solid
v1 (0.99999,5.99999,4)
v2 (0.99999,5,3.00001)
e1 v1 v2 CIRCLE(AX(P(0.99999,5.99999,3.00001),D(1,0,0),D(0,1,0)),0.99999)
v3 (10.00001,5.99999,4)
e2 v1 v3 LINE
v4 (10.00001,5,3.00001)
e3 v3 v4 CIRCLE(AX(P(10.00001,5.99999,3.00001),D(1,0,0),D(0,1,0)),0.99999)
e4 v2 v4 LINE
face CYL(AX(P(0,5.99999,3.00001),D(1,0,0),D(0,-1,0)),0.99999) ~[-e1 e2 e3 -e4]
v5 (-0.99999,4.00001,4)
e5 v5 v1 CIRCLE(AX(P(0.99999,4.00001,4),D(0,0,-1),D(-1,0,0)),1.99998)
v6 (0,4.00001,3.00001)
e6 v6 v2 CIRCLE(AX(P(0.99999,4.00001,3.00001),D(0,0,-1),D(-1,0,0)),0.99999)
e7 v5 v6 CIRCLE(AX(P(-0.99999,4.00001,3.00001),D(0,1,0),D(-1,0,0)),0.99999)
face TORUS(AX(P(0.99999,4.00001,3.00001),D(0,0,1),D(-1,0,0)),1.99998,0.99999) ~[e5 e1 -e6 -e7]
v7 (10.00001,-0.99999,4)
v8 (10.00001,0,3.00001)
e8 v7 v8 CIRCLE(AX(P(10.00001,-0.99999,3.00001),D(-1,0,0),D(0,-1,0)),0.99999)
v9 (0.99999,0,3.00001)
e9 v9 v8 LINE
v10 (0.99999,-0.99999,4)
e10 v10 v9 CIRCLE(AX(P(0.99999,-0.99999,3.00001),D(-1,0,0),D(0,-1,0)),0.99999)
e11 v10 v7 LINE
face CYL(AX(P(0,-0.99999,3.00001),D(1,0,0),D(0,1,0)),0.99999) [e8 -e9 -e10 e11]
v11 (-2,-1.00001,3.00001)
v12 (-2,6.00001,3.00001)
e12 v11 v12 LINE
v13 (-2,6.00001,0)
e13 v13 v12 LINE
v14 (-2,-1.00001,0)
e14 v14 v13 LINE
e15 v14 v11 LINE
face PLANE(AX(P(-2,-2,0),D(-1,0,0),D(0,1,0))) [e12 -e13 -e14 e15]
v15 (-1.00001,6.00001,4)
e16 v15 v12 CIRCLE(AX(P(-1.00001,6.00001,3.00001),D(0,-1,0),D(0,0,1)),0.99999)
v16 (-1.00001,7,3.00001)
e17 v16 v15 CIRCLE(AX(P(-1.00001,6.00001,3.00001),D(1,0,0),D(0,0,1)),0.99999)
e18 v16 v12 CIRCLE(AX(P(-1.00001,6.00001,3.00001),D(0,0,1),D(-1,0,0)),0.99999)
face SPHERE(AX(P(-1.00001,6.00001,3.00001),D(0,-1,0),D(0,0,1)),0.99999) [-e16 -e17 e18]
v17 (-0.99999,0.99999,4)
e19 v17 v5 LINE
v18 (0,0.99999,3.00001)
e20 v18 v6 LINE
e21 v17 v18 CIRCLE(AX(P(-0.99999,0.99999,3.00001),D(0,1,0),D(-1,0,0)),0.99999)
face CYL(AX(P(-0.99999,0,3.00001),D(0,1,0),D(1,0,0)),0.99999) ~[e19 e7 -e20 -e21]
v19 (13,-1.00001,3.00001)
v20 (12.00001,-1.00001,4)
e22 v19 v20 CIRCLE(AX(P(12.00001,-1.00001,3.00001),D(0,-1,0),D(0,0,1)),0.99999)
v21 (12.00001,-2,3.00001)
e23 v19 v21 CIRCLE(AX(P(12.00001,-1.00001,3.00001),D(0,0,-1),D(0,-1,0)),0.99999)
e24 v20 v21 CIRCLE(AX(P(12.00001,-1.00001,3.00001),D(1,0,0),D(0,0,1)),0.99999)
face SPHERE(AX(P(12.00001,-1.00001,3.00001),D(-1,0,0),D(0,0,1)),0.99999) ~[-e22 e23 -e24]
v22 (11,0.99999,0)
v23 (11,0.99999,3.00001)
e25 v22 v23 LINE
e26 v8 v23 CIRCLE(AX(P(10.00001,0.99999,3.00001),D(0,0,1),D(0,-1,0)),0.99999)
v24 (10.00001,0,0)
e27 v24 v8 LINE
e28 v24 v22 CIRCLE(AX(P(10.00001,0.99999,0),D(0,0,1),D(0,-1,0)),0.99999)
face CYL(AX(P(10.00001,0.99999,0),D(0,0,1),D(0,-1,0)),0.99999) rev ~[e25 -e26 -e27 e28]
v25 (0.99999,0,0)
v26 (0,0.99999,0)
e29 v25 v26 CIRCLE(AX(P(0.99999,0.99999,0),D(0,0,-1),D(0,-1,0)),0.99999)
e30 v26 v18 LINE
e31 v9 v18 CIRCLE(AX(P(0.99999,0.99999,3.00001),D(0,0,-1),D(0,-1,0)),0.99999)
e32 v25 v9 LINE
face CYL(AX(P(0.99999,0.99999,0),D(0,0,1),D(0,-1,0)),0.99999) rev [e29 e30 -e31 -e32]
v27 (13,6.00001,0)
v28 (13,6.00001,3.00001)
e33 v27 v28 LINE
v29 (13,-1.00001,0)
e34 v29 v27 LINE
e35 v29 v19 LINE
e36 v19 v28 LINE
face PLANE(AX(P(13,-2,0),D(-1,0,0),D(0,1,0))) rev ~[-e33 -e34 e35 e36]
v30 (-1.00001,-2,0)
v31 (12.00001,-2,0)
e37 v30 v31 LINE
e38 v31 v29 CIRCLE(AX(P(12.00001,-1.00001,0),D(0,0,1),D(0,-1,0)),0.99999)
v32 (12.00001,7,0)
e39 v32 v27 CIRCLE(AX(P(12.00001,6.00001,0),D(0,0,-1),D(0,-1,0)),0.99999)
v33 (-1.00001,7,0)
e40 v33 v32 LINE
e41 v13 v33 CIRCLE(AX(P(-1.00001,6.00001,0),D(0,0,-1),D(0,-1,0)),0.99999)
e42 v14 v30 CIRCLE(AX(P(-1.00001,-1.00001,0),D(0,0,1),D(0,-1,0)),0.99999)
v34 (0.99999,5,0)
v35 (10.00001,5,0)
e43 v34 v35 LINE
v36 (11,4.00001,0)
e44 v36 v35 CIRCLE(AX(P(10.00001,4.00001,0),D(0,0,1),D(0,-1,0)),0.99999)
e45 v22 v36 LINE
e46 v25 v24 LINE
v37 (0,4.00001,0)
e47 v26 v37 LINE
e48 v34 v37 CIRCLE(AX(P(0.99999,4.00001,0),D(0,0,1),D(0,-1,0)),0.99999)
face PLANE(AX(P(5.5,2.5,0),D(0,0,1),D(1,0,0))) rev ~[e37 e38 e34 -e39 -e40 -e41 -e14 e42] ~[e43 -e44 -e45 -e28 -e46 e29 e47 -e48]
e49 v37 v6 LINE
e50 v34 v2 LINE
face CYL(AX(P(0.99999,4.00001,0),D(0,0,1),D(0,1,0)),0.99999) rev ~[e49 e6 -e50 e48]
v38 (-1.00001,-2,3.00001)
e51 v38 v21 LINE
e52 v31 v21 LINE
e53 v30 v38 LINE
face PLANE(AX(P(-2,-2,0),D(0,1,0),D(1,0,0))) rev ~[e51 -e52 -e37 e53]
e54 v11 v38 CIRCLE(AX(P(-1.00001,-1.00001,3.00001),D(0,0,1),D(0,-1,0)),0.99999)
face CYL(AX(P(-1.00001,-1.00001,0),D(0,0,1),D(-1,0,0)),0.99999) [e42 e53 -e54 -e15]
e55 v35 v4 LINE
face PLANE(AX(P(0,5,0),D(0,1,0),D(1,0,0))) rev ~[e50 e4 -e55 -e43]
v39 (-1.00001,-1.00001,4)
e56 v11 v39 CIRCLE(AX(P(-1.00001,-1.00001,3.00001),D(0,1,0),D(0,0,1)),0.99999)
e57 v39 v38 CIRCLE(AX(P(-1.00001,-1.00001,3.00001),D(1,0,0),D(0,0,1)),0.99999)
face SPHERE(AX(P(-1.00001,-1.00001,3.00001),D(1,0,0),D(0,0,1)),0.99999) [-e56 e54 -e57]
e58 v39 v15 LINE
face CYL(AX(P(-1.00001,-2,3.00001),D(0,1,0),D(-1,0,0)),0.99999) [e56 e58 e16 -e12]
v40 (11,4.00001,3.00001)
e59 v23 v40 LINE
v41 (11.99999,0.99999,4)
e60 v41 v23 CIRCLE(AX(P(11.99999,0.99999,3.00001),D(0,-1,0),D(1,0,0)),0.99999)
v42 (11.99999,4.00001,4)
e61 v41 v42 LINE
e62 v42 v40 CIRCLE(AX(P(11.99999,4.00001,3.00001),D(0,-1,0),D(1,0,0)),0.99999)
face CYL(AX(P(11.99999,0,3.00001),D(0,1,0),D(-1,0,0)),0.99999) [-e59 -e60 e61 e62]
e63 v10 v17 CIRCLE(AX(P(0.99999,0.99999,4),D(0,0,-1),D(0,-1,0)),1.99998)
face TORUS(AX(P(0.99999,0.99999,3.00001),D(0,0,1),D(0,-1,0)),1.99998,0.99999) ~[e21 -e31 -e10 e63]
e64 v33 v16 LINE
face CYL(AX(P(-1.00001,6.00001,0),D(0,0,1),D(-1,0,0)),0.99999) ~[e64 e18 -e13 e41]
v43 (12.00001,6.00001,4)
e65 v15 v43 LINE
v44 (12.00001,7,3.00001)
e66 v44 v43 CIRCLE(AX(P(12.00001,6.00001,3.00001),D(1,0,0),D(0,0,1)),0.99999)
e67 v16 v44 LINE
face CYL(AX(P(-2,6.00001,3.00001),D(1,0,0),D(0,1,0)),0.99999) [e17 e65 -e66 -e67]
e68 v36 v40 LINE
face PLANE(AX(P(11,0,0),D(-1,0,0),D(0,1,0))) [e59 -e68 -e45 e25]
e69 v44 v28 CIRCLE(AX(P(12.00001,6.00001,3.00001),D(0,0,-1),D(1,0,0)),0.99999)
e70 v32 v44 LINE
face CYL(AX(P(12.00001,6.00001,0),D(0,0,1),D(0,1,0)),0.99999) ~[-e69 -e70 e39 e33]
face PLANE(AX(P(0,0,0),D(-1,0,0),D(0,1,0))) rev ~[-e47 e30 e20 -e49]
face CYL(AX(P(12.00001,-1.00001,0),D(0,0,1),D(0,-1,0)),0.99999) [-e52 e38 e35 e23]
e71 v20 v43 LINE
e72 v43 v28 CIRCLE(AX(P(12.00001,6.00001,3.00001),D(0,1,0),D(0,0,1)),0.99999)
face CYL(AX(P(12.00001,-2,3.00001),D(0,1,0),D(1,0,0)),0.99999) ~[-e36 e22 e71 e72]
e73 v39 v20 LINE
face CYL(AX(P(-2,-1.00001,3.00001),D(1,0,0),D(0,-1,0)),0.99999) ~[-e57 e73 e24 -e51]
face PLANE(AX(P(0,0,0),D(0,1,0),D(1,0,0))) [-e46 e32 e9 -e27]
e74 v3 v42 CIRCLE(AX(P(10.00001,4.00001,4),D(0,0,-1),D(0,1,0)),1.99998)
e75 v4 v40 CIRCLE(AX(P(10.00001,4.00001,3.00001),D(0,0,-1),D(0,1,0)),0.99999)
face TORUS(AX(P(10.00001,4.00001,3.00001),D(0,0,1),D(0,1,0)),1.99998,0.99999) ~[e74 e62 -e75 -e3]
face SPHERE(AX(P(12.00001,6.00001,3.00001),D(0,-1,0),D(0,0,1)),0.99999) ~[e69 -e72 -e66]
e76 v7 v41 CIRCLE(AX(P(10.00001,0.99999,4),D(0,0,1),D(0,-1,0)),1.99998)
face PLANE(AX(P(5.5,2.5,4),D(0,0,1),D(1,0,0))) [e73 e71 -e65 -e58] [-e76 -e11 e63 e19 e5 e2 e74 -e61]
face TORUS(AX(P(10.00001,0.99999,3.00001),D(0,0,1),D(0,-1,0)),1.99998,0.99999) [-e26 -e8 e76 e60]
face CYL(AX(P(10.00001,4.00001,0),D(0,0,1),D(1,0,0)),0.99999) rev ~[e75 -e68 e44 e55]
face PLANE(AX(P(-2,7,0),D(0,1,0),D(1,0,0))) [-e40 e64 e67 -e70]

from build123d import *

# Parameters (mm, degrees)
F0_W     = 15
F0_H     = 9
F0_W_2   = 11
F0_H_2   = 5
F1_DEPTH = 4
F2_R     = 0.99999


# Not quite as in the source:
# - a fillet or chamfer is up to 0.001 mm smaller than in the source, because OpenCascade refuses the exact size


with BuildPart() as f1:
    # F0 (on Top) → F1 (new body)
    with BuildSketch(Plane.XY):
        with Locations((5.5, 2.5)):
            Rectangle(F0_W, F0_H)
        with Locations((5.5, 2.5)):
            Rectangle(F0_W_2, F0_H_2, mode=Mode.SUBTRACT)
    extrude(amount=F1_DEPTH)

    # F2 (radius 1 in the source; OpenCascade refuses exactly that, so slightly less here)
    f2_edges = [f1.edges().sort_by_distance(p)[0] for p in [
        (5.5, -2, 4),
        (13, 2.5, 4),
        (5.5, 0, 4),
        (-2, 2.5, 4),
        (0, 2.5, 4),
        (5.5, 7, 4),
        (5.5, 5, 4),
        (11, 2.5, 4),
        (-2, -2, 2),
        (13, -2, 2),
        (11, 0, 2),
        (0, 0, 2),
        (-2, 7, 2),
        (13, 7, 2),
        (11, 5, 2),
        (0, 5, 2),
    ]]
    fillet(f2_edges, radius=F2_R)


solid = f1.part
